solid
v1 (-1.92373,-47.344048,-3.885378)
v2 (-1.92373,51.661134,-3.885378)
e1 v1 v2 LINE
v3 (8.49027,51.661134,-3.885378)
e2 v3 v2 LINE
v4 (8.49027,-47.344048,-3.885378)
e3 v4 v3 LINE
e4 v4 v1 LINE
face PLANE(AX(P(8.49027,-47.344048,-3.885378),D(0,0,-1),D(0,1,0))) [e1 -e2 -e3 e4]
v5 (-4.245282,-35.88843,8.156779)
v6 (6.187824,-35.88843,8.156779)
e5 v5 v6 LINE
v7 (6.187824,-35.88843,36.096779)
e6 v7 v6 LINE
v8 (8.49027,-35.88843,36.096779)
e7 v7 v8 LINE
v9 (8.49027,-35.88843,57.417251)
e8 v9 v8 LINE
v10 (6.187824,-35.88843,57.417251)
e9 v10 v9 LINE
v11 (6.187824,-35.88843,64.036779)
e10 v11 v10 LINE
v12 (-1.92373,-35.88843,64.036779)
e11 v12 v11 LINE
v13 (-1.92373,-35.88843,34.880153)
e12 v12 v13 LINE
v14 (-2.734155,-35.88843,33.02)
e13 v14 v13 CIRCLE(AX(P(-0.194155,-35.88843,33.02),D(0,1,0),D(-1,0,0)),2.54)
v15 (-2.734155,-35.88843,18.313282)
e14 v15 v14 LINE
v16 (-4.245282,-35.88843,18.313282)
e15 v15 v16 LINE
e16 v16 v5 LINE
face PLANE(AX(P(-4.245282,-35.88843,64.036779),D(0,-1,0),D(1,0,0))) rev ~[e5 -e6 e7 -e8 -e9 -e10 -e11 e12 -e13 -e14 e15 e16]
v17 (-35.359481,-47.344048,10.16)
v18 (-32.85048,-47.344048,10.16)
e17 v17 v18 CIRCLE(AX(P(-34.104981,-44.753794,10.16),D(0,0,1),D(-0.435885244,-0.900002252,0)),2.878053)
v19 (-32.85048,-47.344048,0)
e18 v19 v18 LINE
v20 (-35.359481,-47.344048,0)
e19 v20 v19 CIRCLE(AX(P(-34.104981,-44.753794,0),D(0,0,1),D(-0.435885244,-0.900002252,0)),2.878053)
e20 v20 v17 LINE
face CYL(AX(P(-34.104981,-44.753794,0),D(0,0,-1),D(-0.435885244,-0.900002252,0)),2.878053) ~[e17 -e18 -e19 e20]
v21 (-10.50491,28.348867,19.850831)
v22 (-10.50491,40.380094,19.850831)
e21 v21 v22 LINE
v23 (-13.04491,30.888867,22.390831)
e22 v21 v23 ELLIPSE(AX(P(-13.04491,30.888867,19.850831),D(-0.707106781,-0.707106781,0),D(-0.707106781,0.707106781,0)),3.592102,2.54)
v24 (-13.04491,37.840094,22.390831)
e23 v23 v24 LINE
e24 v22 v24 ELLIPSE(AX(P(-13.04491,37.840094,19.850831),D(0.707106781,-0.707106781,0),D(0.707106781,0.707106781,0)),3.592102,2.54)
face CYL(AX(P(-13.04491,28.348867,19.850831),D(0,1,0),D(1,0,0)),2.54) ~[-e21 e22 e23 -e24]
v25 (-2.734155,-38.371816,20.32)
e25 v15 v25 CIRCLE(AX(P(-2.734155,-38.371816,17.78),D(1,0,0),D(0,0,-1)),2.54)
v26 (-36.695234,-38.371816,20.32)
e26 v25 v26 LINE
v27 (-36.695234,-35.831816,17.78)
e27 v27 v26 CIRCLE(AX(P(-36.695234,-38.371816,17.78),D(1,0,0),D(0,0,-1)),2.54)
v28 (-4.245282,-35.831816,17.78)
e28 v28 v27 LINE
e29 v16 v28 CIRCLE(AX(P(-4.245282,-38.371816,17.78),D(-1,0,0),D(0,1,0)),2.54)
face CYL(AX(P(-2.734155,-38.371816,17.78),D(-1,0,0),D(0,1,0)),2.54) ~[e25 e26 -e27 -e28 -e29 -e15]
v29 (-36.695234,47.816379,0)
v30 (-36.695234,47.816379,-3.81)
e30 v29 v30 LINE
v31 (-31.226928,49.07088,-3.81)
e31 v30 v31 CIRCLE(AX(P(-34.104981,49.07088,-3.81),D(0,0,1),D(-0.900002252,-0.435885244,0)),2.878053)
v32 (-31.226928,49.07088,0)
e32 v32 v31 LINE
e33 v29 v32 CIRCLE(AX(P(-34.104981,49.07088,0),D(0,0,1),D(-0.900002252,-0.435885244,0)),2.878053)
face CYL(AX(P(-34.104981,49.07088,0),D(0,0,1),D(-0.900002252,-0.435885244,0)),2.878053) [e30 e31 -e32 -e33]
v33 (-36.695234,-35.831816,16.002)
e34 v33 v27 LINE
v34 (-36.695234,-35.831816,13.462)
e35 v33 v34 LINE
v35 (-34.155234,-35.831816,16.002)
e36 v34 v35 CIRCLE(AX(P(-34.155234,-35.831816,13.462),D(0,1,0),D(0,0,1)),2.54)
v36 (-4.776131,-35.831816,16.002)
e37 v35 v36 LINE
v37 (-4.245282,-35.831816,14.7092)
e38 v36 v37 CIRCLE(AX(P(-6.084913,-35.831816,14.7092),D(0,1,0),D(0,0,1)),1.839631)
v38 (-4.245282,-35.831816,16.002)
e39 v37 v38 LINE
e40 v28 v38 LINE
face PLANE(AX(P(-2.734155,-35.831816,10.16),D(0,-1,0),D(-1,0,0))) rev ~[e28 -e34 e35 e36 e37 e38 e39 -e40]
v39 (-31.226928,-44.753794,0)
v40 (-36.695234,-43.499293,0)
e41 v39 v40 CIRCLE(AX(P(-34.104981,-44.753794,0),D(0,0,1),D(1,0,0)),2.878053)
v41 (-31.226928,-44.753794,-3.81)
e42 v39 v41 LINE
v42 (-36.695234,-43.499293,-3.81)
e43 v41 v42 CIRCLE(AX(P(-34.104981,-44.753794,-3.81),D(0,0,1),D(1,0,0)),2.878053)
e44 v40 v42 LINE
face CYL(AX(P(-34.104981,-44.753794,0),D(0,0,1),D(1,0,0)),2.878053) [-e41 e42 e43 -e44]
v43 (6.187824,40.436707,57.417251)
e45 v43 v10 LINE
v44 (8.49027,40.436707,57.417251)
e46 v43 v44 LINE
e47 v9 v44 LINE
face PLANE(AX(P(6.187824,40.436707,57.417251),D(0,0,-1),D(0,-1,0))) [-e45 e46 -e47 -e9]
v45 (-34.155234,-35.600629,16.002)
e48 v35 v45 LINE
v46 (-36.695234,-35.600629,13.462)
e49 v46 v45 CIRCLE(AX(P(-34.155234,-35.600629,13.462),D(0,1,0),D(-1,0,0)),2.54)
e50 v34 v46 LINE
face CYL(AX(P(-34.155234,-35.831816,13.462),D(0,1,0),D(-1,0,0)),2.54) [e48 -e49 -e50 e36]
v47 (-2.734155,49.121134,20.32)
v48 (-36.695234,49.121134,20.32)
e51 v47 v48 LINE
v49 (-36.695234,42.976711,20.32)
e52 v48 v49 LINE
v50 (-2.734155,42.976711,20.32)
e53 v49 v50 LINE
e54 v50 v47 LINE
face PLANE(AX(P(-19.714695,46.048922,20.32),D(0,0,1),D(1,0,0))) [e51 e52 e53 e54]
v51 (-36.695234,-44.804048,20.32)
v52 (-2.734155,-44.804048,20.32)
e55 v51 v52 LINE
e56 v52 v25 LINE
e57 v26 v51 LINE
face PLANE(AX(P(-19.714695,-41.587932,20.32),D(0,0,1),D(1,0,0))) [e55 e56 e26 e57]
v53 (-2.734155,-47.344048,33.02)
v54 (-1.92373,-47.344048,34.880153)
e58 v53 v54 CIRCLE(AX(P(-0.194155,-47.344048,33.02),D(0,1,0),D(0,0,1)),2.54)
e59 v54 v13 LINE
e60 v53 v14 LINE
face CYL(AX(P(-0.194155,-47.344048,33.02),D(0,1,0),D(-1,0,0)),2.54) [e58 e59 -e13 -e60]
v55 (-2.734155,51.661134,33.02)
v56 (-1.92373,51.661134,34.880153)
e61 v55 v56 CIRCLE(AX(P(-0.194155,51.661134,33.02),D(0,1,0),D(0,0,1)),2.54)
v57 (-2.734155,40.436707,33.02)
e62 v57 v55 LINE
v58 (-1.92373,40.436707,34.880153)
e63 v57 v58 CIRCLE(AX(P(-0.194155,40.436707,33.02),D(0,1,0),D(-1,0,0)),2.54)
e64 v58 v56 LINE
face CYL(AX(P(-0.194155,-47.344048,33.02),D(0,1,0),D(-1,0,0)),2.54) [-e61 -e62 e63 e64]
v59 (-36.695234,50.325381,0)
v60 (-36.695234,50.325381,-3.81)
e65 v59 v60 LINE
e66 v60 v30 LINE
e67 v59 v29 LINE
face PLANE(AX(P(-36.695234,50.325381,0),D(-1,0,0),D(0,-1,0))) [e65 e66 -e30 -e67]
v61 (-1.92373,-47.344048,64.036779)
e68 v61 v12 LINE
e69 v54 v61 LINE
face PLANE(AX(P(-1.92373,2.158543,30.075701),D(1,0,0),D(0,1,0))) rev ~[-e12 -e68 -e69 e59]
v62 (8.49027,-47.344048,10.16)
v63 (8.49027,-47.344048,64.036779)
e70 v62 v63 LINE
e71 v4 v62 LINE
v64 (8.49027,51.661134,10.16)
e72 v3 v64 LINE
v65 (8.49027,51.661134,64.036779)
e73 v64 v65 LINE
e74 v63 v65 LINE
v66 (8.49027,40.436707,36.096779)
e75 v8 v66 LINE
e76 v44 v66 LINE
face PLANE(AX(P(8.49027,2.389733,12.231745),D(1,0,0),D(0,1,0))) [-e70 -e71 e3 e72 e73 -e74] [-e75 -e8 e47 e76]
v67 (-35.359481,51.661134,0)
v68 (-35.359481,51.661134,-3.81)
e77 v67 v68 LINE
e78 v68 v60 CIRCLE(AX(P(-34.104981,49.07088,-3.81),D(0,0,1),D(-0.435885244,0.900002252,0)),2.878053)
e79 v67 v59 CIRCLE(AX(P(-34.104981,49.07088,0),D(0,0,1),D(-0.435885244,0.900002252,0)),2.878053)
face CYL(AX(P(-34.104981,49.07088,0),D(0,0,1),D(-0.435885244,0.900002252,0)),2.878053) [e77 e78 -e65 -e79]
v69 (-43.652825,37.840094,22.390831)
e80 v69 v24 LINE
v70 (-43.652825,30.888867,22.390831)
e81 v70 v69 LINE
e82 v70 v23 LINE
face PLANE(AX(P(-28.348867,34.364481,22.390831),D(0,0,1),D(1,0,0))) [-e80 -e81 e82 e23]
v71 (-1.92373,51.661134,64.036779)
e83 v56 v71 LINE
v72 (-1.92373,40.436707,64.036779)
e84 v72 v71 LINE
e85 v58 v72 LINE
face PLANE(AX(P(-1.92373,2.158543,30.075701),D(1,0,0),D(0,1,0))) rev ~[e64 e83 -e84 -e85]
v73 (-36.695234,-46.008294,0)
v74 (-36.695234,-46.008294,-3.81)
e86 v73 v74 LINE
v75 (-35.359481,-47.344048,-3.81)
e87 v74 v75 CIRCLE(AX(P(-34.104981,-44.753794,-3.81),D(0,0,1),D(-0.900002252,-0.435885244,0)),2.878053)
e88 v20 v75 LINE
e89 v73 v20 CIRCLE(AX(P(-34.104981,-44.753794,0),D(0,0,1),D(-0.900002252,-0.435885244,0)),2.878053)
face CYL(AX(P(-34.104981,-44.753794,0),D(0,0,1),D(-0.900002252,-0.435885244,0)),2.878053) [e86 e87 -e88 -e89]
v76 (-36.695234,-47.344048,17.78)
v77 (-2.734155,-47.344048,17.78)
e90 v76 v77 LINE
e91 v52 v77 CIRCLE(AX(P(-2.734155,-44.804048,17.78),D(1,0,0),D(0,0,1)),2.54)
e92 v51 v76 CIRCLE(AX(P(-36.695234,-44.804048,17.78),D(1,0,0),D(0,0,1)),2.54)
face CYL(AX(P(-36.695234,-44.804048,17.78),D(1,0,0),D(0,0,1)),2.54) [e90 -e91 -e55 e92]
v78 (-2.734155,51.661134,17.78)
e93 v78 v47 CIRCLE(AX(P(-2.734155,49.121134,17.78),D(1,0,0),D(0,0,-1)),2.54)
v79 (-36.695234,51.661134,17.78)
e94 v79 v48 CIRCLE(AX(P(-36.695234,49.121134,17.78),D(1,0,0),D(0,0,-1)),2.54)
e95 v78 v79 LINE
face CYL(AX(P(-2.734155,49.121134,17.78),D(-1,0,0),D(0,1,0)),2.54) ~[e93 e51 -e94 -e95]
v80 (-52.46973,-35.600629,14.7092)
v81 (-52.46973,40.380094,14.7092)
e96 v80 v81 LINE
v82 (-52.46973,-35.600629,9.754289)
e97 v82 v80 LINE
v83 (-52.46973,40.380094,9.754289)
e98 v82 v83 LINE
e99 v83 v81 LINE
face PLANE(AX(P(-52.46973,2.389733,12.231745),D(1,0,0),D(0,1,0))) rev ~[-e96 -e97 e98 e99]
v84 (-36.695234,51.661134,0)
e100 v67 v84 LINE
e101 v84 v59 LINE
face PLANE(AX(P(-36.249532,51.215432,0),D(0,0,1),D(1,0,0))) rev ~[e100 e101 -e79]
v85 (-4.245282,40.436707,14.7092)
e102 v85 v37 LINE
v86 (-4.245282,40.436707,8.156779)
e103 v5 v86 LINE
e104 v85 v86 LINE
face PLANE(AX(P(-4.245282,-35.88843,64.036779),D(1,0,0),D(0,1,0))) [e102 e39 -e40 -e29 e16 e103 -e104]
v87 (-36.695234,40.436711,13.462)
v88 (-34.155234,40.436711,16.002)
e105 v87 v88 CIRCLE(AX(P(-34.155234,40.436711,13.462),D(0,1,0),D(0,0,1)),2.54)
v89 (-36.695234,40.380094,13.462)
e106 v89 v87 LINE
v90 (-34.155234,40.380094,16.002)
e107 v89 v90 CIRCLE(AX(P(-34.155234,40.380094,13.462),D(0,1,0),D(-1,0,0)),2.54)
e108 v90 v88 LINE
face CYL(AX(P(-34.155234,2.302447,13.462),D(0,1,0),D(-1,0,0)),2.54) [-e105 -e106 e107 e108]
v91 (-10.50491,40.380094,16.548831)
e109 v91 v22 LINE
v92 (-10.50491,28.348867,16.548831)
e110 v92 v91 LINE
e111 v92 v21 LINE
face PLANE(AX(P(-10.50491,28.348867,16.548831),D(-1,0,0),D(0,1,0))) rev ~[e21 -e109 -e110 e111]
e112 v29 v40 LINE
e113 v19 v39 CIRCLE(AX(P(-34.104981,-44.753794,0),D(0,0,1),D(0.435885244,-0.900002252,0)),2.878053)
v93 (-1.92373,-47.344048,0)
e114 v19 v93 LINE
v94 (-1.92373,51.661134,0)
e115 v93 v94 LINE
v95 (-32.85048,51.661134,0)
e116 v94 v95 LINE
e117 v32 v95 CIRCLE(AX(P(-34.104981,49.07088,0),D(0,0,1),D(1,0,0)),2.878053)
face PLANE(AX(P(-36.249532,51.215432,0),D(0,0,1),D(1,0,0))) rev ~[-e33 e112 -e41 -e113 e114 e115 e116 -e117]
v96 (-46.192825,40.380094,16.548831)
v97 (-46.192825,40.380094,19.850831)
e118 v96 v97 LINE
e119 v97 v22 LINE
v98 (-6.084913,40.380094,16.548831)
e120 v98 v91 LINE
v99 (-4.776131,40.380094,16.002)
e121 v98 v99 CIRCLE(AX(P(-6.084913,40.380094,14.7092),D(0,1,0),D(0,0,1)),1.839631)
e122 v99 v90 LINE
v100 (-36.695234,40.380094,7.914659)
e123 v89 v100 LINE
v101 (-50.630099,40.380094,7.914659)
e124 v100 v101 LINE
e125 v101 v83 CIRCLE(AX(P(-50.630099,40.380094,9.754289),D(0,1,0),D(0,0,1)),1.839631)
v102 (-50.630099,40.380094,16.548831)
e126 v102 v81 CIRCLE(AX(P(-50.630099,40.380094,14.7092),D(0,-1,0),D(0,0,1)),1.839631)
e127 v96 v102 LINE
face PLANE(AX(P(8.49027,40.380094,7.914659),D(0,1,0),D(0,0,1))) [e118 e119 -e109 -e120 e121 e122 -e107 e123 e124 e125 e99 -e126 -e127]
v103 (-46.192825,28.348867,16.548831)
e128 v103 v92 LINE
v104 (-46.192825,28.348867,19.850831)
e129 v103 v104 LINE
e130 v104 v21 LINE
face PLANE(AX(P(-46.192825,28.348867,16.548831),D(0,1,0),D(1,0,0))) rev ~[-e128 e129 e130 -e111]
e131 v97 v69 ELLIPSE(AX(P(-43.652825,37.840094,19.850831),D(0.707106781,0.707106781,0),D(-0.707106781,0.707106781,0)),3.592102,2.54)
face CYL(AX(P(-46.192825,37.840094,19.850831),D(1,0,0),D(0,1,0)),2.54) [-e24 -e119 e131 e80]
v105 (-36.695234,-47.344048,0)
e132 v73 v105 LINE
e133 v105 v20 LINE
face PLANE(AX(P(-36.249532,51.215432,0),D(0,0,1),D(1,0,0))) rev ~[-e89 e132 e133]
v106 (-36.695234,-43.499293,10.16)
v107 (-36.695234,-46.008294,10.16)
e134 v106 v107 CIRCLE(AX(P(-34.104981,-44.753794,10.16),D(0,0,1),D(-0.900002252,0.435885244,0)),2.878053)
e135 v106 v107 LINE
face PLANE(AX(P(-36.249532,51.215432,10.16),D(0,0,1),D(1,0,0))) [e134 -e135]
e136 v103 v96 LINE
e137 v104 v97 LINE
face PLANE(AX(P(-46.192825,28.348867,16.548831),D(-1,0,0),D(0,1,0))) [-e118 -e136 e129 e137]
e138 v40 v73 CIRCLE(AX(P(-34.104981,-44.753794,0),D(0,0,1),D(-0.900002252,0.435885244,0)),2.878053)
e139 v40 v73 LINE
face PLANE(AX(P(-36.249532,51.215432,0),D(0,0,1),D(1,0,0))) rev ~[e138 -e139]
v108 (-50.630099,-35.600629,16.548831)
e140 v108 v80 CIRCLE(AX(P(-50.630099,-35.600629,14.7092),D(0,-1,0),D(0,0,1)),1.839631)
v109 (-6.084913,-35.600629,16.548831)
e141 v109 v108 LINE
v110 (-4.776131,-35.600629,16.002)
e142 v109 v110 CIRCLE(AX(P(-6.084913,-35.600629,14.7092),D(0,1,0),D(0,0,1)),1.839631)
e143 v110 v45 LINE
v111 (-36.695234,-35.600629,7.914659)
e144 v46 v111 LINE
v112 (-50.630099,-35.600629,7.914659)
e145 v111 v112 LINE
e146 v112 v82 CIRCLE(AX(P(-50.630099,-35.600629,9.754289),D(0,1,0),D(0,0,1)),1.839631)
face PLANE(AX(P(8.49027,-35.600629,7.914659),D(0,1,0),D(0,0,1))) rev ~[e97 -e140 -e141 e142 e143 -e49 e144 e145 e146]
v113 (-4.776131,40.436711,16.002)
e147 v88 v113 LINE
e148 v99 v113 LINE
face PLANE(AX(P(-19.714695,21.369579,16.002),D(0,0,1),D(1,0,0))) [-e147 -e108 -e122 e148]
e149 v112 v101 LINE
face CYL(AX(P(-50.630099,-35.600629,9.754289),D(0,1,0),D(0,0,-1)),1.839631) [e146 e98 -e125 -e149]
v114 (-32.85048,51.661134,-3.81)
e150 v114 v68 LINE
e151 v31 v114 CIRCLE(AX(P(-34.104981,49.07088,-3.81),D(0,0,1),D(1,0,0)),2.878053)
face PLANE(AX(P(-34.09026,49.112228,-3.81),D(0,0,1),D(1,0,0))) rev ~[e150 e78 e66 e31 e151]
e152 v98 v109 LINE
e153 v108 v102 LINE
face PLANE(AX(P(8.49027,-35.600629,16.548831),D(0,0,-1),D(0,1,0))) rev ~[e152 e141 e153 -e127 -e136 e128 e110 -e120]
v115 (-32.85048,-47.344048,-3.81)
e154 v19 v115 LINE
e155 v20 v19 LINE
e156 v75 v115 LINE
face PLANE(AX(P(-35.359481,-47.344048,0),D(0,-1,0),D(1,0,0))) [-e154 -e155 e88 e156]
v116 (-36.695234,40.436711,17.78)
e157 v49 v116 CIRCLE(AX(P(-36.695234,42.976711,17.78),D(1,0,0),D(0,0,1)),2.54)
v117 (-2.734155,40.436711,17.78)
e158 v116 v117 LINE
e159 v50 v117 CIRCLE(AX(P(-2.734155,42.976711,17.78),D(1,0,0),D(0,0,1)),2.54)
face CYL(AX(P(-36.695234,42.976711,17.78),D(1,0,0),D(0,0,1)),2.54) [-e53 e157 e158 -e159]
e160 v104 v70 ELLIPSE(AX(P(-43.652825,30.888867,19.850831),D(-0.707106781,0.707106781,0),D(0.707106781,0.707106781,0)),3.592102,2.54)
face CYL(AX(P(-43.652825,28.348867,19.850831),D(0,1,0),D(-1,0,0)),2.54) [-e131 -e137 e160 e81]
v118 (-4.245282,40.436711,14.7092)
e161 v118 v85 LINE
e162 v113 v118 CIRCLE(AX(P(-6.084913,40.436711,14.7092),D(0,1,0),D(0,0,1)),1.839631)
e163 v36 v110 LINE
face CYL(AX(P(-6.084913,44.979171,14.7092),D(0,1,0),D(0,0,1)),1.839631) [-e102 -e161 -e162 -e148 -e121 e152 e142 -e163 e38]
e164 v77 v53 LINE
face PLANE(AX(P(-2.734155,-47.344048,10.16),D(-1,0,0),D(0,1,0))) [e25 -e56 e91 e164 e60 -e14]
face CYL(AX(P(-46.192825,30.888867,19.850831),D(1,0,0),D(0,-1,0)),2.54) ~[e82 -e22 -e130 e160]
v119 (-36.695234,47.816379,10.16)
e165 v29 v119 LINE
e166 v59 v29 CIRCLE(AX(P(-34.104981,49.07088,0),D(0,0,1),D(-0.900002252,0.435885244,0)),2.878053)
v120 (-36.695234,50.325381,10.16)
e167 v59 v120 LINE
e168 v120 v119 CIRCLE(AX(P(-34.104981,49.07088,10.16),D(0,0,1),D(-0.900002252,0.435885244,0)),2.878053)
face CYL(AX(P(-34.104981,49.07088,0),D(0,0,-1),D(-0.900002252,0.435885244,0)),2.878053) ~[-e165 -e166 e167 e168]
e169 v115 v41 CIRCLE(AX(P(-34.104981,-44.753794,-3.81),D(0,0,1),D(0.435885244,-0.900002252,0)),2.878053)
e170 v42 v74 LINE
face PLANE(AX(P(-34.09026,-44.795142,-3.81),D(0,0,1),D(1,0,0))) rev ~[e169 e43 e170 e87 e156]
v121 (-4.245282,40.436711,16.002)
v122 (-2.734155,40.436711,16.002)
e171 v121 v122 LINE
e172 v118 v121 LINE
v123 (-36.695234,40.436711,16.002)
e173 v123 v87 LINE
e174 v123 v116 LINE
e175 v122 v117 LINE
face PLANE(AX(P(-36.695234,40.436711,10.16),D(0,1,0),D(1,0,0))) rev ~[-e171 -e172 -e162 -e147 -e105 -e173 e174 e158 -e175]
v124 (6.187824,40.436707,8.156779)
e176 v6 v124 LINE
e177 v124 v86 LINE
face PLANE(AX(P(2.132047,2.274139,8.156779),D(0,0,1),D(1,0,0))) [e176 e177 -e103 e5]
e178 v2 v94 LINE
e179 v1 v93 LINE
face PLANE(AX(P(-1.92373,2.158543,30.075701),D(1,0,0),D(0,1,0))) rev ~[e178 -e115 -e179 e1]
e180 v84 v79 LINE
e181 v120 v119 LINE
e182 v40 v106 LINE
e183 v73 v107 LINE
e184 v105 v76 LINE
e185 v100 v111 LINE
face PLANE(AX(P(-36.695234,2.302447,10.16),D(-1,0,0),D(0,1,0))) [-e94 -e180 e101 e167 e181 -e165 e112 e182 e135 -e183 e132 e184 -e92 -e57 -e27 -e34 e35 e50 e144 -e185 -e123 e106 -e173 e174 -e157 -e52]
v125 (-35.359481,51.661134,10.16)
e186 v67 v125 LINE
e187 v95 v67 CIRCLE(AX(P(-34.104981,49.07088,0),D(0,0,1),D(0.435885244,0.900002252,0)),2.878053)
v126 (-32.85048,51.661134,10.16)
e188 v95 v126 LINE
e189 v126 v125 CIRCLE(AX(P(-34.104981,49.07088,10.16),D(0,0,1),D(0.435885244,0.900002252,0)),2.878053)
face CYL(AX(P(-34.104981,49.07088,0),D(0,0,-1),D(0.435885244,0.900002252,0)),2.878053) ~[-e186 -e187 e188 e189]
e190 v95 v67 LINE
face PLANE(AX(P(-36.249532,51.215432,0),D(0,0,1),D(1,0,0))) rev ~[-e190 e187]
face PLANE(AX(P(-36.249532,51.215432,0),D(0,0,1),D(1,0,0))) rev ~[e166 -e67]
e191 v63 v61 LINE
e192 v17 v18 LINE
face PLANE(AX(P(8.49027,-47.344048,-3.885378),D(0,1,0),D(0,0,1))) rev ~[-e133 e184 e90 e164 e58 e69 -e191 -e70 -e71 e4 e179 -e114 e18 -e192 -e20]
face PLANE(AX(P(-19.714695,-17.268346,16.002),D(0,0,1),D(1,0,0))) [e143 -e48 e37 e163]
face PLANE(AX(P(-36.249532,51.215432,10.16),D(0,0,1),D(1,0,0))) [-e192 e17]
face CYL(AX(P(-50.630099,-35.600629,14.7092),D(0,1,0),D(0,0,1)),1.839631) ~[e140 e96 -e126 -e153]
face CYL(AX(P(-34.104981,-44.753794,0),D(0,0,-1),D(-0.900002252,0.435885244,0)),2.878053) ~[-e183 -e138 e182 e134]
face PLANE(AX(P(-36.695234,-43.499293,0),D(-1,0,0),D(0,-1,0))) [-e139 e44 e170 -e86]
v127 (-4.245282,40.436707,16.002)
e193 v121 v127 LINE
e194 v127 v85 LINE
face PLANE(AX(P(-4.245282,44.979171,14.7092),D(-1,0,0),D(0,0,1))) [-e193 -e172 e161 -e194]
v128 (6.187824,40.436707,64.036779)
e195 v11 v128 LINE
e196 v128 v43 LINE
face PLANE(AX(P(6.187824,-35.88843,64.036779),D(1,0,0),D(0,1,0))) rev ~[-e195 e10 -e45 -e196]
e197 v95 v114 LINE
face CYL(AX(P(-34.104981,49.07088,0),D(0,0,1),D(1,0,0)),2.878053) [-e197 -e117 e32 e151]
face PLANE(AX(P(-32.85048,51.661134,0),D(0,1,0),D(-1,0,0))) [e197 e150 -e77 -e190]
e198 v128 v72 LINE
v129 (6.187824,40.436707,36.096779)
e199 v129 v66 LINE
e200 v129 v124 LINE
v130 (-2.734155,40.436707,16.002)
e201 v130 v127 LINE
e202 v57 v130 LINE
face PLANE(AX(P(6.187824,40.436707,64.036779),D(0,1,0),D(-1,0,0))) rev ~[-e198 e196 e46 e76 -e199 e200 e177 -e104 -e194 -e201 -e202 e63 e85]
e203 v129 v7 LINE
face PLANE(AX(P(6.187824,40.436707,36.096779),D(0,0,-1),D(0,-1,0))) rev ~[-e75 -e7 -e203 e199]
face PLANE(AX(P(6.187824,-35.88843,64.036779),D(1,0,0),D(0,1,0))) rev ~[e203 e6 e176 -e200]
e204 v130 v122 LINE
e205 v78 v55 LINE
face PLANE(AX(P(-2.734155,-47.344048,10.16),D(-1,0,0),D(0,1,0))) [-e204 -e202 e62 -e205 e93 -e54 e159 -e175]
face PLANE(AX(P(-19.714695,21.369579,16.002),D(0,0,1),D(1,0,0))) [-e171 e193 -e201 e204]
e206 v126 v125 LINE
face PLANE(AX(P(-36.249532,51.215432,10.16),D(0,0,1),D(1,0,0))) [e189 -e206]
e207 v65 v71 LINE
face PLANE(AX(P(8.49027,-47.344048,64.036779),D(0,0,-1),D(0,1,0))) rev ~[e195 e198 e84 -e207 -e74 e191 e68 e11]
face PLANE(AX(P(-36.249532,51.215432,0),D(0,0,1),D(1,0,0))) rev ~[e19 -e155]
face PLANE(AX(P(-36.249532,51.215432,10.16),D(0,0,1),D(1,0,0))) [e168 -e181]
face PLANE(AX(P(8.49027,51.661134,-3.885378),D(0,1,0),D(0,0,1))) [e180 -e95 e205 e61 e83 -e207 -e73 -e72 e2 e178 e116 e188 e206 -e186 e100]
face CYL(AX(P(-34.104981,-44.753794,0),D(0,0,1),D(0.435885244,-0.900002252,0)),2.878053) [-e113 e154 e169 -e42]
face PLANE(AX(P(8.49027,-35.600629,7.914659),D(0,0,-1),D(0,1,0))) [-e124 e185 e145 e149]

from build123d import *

# Parameters (mm, degrees)
F0_W         = 22.5927522406
F0_H         = 49.5025906712
F1_DEPTH     = 10.16
F2_DEPTH     = 3.81
F3_W         = 11.2244246993
F3_H         = 99.0051813424
F4_DEPTH     = 25.4
F6_DEPTH     = 10.16
F7_R         = 2.54
F8_W         = 33.9610797819
F8_H         = 38.1342638284
F8_H_2       = 37.1269418392
F9_DEPTH     = 5.842
F10_R        = 2.54
F11_W        = 99.0051813424
F11_H        = 67.9221570026
F11_W_2      = 75.9807229042
F11_H_2      = 8.63417238
F12_DEPTH    = 10.414
F13_W        = 19.139082171
F13_H        = 29.1566260799
F13_W_2      = 6.5123029053
F13_H_2      = 0.8140355349
F13_W_3      = 18.2694643736
F13_W_4      = 7.5298482552
F13_W_5      = 18.2365168585
F13_W_6      = 7.1228295565
F13_W_7      = 18.1018151343
F13_W_8      = 7.1228314191
F14_DEPTH    = 0.254
F15_DEPTH    = 1.524
F16_DEPTH    = 60.96
F17_W        = 8.1115535974
F17_H        = 76.3251371682
F17_W_2      = 2.3215521545
F18_DEPTH    = 55.88
F19_R        = 1.8396307345
F20_T4_DEPTH = 85.1788765768
F21_W        = 35.6879150495
F21_H        = 12.0312273502
F22_DEPTH    = 5.842
F23_R        = 2.54
F24_W        = 76.3251371682
F24_H        = 21.320472064
F25_DEPTH    = 25.4


# Not quite as in the source:
# - a fillet or chamfer that OpenCascade refuses, or shapes differently, is made with other operations: its cross-section is extruded or revolved along the edge and cut away or added
# - a feature names something its author has since deleted; it is built from what else it names


with BuildPart() as f1:
    # F0 (on Top) → F1 (new body)
    with BuildSketch(Plane.XY):
        with BuildLine():
            Line((-35.3594812499, 51.6611337662), (-36.6952344775, 51.6611337662))
            Line((-36.6952344775, 51.6611337662), (-36.6952344775, 50.3253805386))
            ThreePointArc((-36.6952344775, 50.3253805386), (-36.1400711383, 51.105970427), (-35.3594812499, 51.6611337662))
        make_face()
        with BuildLine():
            ThreePointArc((-32.8504798068, 51.6611337662), (-34.1049805284, 51.9489325583), (-35.3594812499, 51.6611337662))
            Line((-35.3594812499, 51.6611337662), (-32.8504798068, 51.6611337662))
        make_face()
        with BuildLine():
            Line((-32.8504798068, 51.6611337662), (-35.3594812499, 51.6611337662))
            ThreePointArc((-35.3594812499, 51.6611337662), (-36.1400711383, 51.105970427), (-36.6952344775, 50.3253805386))
            Line((-36.6952344775, 50.3253805386), (-36.6952344775, 47.8163790954))
            ThreePointArc((-36.6952344775, 47.8163790954), (-33.4614356183, 46.2656993361), (-31.2269277871, 49.070879817))
            ThreePointArc((-31.2269277871, 49.070879817), (-31.6663634179, 50.5993869876), (-32.8504798068, 51.6611337662))
        make_face()
        with BuildLine():
            Line((-36.6952344775, 47.8163790954), (-36.6952344775, 50.3253805386))
            ThreePointArc((-36.6952344775, 50.3253805386), (-36.9830332696, 49.070879817), (-36.6952344775, 47.8163790954))
        make_face()
        with BuildLine():
            Line((-14.1024822369, 51.6611337662), (-32.8504798068, 51.6611337662))
            ThreePointArc((-32.8504798068, 51.6611337662), (-31.6663634179, 50.5993869876), (-31.2269277871, 49.070879817))
            ThreePointArc((-31.2269277871, 49.070879817), (-33.4614356183, 46.2656993361), (-36.6952344775, 47.8163790954))
            Line((-36.6952344775, 47.8163790954), (-36.6952344775, 2.158543095))
            Line((-36.6952344775, 2.158543095), (-14.1024822369, 2.158543095))
            Line((-14.1024822369, 2.158543095), (-14.1024822369, 51.6611337662))
        make_face()
        with Locations((-2.8061061166, 26.9098384306)):
            Rectangle(F0_W, F0_H)
        with BuildLine():
            Line((-14.1024822369, 2.158543095), (-36.6952344775, 2.158543095))
            Line((-36.6952344775, 2.158543095), (-36.6952344775, -43.4992929054))
            ThreePointArc((-36.6952344775, -43.4992929054), (-33.4614356183, -41.9486131461), (-31.2269277871, -44.753793627))
            ThreePointArc((-31.2269277871, -44.753793627), (-31.6663634179, -46.2823007976), (-32.8504798068, -47.3440475762))
            Line((-32.8504798068, -47.3440475762), (-14.1024822369, -47.3440475762))
            Line((-14.1024822369, -47.3440475762), (-14.1024822369, 2.158543095))
        make_face()
        with Locations((-2.8061061166, -22.5927522406)):
            Rectangle(F0_W, F0_H)
        with BuildLine():
            ThreePointArc((-31.2269277871, -44.753793627), (-33.4614356183, -41.9486131461), (-36.6952344775, -43.4992929054))
            Line((-36.6952344775, -43.4992929054), (-36.6952344775, -46.0082943486))
            ThreePointArc((-36.6952344775, -46.0082943486), (-36.1400711383, -46.788884237), (-35.3594812499, -47.3440475762))
            Line((-35.3594812499, -47.3440475762), (-32.8504798068, -47.3440475762))
            ThreePointArc((-32.8504798068, -47.3440475762), (-31.6663634179, -46.2823007976), (-31.2269277871, -44.753793627))
        make_face()
        with BuildLine():
            Line((-36.6952344775, -46.0082943486), (-36.6952344775, -43.4992929054))
            ThreePointArc((-36.6952344775, -43.4992929054), (-36.9830332696, -44.753793627), (-36.6952344775, -46.0082943486))
        make_face()
        with BuildLine():
            ThreePointArc((-35.3594812499, -47.3440475762), (-36.1400711383, -46.788884237), (-36.6952344775, -46.0082943486))
            Line((-36.6952344775, -46.0082943486), (-36.6952344775, -47.3440475762))
            Line((-36.6952344775, -47.3440475762), (-35.3594812499, -47.3440475762))
        make_face()
        with BuildLine():
            ThreePointArc((-35.3594812499, -47.3440475762), (-34.1049805284, -47.6318463683), (-32.8504798068, -47.3440475762))
            Line((-32.8504798068, -47.3440475762), (-35.3594812499, -47.3440475762))
        make_face()
    extrude(amount=F1_DEPTH)

    # F0 (on Top) → F2 (join)
    with BuildSketch(Plane.XY):
        with BuildLine():
            Line((-32.8504798068, 51.6611337662), (-35.3594812499, 51.6611337662))
            ThreePointArc((-35.3594812499, 51.6611337662), (-36.1400711383, 51.105970427), (-36.6952344775, 50.3253805386))
            Line((-36.6952344775, 50.3253805386), (-36.6952344775, 47.8163790954))
            ThreePointArc((-36.6952344775, 47.8163790954), (-33.4614356183, 46.2656993361), (-31.2269277871, 49.070879817))
            ThreePointArc((-31.2269277871, 49.070879817), (-31.6663634179, 50.5993869876), (-32.8504798068, 51.6611337662))
        make_face()
        with BuildLine():
            ThreePointArc((-31.2269277871, -44.753793627), (-33.4614356183, -41.9486131461), (-36.6952344775, -43.4992929054))
            Line((-36.6952344775, -43.4992929054), (-36.6952344775, -46.0082943486))
            ThreePointArc((-36.6952344775, -46.0082943486), (-36.1400711383, -46.788884237), (-35.3594812499, -47.3440475762))
            Line((-35.3594812499, -47.3440475762), (-32.8504798068, -47.3440475762))
            ThreePointArc((-32.8504798068, -47.3440475762), (-31.6663634179, -46.2823007976), (-31.2269277871, -44.753793627))
        make_face()
    extrude(amount=-F2_DEPTH)

    # F3 (on face) → F4 (join)
    with BuildSketch(Plane.XY.offset(10.16)):
        with Locations((2.878057654, 2.158543095)):
            Rectangle(F3_W, F3_H)
    extrude(amount=F4_DEPTH)

    # F5 (on face) → F6 (join)
    with BuildSketch(Plane.XY.offset(10.16)):
        Polygon((-2.7341546956, 40.4367111623), (-2.7341546956, 51.6611337662), (-32.8504798068, 51.6611337662), (-35.3594812499, 51.6611337662), (-36.6952344775, 51.6611337662), (-36.6952344775, 50.3253805386), (-36.6952344775, 47.8163790954), (-36.6952344775, 40.4367111623), align=None)
        Polygon((-2.7341546956, -47.3440475762), (-2.7341546956, -35.8318164945), (-36.6952344775, -35.8318164945), (-36.6952344775, -43.4992929054), (-36.6952344775, -46.0082943486), (-36.6952344775, -47.3440475762), (-35.3594812499, -47.3440475762), (-32.8504798068, -47.3440475762), align=None)
    extrude(amount=F6_DEPTH)

    # F7
    f7_edges = [f1.edges().sort_by_distance(p)[0] for p in [
        (-2.734155, 2.158543, 35.56),
        (-19.714695, -35.831816, 20.32),
        (-19.714695, -47.344048, 20.32),
        (-19.714695, 51.661134, 20.32),
        (-19.714695, 40.436711, 20.32),
    ]]
    fillet(f7_edges, radius=F7_R)

    # F8 (on face) → F9 (join)
    with BuildSketch(Plane.XY.offset(10.16)):
        with Locations((-19.7146945866, 21.3695792481)):
            Rectangle(F8_W, F8_H)
        with Locations((-19.7146945866, -17.2683455748)):
            Rectangle(F8_W, F8_H_2)
    extrude(amount=F9_DEPTH)

    # F10
    f10_edges = [f1.edges().sort_by_distance(p)[0] for p in [
        (-19.714695, 1.295125, 16.002),
        (-19.714695, 2.302447, 16.002),
        (-36.695234, -17.268346, 16.002),
        (-36.695234, 21.369579, 16.002),
    ]]
    fillet(f10_edges, radius=F10_R)

    # F11 (on face) → F12 (join)
    with BuildSketch(Plane.YZ.offset(8.4902700037)):
        with Locations((2.158543095, 30.0757006044)):
            Rectangle(F11_W, F11_H)
        with Locations((2.3897327483, 12.2317448258)):
            Rectangle(F11_W_2, F11_H_2, mode=Mode.SUBTRACT)
    extrude(amount=-F12_DEPTH)

    # F13 (on face) → F14 (join)
    with BuildSketch(Plane(origin=(-1.9237299963, 0, 0), x_dir=(0, -1, 0), z_dir=(-1, 0, 0))):
        with Locations((-30.8671663515, 49.4584660657)):
            Rectangle(F13_W, F13_H)
        with Locations((-30.3225759417, 61.080571264)):
            Rectangle(F13_W_2, F13_H_2, mode=Mode.SUBTRACT)
        with Locations((-11.2932752818, 49.4584660657)):
            Rectangle(F13_W_3, F13_H)
        with Locations((-11.4979553036, 61.080571264)):
            Rectangle(F13_W_4, F13_H_2, mode=Mode.SUBTRACT)
        with Locations((7.7183801332, 49.4584660657)):
            Rectangle(F13_W_5, F13_H)
        with Locations((7.9371919855, 61.080571264)):
            Rectangle(F13_W_6, F13_H_2, mode=Mode.SUBTRACT)
        with Locations((26.7809126526, 49.4584660657)):
            Rectangle(F13_W_7, F13_H)
        with Locations((27.0670773461, 61.080571264)):
            Rectangle(F13_W_8, F13_H_2, mode=Mode.SUBTRACT)
    extrude(amount=F14_DEPTH)

    # F13 (on face) → F15 (join)
    with BuildSketch(Plane(origin=(-1.9237299963, 0, 0), x_dir=(0, -1, 0), z_dir=(-1, 0, 0))):
        with Locations((27.0670773461, 61.080571264)):
            Rectangle(F13_W_8, F13_H_2)
        with Locations((7.9371919855, 61.080571264)):
            Rectangle(F13_W_6, F13_H_2)
        with Locations((-11.4979553036, 61.080571264)):
            Rectangle(F13_W_4, F13_H_2)
        with Locations((-30.3225759417, 61.080571264)):
            Rectangle(F13_W_2, F13_H_2)
    extrude(amount=F15_DEPTH)

    # F11 (on face) → F16 (join)
    with BuildSketch(Plane.YZ.offset(8.4902700037)):
        with Locations((2.3897327483, 12.2317448258)):
            Rectangle(F11_W_2, F11_H_2)
    extrude(amount=-F16_DEPTH)

    # F17 (on face) → F18 (cut)
    with BuildSketch(Plane.XY.offset(64.0367791057)):
        with Locations((2.1320468024, 2.274138853)):
            Rectangle(F17_W, F17_H)
        with Locations((-3.0845060736, 2.274138853)):
            Rectangle(F17_W_2, F17_H)
    extrude(amount=-F18_DEPTH, mode=Mode.SUBTRACT)

    # F19
    f19_edges = [f1.edges().sort_by_distance(p)[0] for p in [
        (-52.46973, 2.389733, 16.548831),
        (-52.46973, 2.389733, 7.914659),
    ]]
    fillet(f19_edges, radius=F19_R)

    # F20: fillet of radius 1.8396307345 on 1 edges, made by hand


with BuildPart() as f20_tool2:
    # F20_s3 → F20_t4 (new body)
    with BuildSketch(Plane.XZ.offset(-44.9791710367)):
        with BuildLine():
            ThreePointArc((-6.0849128853, 16.5488310158), (-4.7840975181, 16.0100156486), (-4.2452821508, 14.7092002813))
            Line((-4.2452821508, 14.7092002813), (-4.2452821508, 16.5488310158))
            Line((-4.2452821508, 16.5488310158), (-6.0849128853, 16.5488310158))
        make_face()
    extrude(amount=F20_T4_DEPTH)

    split(bisect_by=Plane.XZ.offset(-40.4367111623), keep=Keep.TOP)

    split(bisect_by=Plane.XZ.offset(35.8318164945), keep=Keep.BOTTOM)


with BuildPart() as f1_1:
    add(f1.part)

    # F20_t1: cut F20_tool2
    add(f20_tool2.part, mode=Mode.SUBTRACT)

    # F21 (on face) → F22 (join)
    with BuildSketch(Plane.XY.offset(16.5488310158)):
        with Locations((-28.3488673158, 34.3644805253)):
            Rectangle(F21_W, F21_H)
    extrude(amount=F22_DEPTH)

    # F23
    f23_edges = [f1_1.edges().sort_by_distance(p)[0] for p in [
        (-10.50491, 34.364481, 22.390831),
        (-28.348867, 28.348867, 22.390831),
        (-46.192825, 34.364481, 22.390831),
        (-28.348867, 40.380094, 22.390831),
    ]]
    fillet(f23_edges, radius=F23_R)

    # F24 (on face) → F25 (cut)
    with BuildSketch(Plane(origin=(6.1878236011, 0, 0), x_dir=(0, -1, 0), z_dir=(-1, 0, 0))):
        with Locations((-2.274138853, 46.7570151377)):
            Rectangle(F24_W, F24_H)
    extrude(amount=-F25_DEPTH, mode=Mode.SUBTRACT)


solid = f1_1.part
